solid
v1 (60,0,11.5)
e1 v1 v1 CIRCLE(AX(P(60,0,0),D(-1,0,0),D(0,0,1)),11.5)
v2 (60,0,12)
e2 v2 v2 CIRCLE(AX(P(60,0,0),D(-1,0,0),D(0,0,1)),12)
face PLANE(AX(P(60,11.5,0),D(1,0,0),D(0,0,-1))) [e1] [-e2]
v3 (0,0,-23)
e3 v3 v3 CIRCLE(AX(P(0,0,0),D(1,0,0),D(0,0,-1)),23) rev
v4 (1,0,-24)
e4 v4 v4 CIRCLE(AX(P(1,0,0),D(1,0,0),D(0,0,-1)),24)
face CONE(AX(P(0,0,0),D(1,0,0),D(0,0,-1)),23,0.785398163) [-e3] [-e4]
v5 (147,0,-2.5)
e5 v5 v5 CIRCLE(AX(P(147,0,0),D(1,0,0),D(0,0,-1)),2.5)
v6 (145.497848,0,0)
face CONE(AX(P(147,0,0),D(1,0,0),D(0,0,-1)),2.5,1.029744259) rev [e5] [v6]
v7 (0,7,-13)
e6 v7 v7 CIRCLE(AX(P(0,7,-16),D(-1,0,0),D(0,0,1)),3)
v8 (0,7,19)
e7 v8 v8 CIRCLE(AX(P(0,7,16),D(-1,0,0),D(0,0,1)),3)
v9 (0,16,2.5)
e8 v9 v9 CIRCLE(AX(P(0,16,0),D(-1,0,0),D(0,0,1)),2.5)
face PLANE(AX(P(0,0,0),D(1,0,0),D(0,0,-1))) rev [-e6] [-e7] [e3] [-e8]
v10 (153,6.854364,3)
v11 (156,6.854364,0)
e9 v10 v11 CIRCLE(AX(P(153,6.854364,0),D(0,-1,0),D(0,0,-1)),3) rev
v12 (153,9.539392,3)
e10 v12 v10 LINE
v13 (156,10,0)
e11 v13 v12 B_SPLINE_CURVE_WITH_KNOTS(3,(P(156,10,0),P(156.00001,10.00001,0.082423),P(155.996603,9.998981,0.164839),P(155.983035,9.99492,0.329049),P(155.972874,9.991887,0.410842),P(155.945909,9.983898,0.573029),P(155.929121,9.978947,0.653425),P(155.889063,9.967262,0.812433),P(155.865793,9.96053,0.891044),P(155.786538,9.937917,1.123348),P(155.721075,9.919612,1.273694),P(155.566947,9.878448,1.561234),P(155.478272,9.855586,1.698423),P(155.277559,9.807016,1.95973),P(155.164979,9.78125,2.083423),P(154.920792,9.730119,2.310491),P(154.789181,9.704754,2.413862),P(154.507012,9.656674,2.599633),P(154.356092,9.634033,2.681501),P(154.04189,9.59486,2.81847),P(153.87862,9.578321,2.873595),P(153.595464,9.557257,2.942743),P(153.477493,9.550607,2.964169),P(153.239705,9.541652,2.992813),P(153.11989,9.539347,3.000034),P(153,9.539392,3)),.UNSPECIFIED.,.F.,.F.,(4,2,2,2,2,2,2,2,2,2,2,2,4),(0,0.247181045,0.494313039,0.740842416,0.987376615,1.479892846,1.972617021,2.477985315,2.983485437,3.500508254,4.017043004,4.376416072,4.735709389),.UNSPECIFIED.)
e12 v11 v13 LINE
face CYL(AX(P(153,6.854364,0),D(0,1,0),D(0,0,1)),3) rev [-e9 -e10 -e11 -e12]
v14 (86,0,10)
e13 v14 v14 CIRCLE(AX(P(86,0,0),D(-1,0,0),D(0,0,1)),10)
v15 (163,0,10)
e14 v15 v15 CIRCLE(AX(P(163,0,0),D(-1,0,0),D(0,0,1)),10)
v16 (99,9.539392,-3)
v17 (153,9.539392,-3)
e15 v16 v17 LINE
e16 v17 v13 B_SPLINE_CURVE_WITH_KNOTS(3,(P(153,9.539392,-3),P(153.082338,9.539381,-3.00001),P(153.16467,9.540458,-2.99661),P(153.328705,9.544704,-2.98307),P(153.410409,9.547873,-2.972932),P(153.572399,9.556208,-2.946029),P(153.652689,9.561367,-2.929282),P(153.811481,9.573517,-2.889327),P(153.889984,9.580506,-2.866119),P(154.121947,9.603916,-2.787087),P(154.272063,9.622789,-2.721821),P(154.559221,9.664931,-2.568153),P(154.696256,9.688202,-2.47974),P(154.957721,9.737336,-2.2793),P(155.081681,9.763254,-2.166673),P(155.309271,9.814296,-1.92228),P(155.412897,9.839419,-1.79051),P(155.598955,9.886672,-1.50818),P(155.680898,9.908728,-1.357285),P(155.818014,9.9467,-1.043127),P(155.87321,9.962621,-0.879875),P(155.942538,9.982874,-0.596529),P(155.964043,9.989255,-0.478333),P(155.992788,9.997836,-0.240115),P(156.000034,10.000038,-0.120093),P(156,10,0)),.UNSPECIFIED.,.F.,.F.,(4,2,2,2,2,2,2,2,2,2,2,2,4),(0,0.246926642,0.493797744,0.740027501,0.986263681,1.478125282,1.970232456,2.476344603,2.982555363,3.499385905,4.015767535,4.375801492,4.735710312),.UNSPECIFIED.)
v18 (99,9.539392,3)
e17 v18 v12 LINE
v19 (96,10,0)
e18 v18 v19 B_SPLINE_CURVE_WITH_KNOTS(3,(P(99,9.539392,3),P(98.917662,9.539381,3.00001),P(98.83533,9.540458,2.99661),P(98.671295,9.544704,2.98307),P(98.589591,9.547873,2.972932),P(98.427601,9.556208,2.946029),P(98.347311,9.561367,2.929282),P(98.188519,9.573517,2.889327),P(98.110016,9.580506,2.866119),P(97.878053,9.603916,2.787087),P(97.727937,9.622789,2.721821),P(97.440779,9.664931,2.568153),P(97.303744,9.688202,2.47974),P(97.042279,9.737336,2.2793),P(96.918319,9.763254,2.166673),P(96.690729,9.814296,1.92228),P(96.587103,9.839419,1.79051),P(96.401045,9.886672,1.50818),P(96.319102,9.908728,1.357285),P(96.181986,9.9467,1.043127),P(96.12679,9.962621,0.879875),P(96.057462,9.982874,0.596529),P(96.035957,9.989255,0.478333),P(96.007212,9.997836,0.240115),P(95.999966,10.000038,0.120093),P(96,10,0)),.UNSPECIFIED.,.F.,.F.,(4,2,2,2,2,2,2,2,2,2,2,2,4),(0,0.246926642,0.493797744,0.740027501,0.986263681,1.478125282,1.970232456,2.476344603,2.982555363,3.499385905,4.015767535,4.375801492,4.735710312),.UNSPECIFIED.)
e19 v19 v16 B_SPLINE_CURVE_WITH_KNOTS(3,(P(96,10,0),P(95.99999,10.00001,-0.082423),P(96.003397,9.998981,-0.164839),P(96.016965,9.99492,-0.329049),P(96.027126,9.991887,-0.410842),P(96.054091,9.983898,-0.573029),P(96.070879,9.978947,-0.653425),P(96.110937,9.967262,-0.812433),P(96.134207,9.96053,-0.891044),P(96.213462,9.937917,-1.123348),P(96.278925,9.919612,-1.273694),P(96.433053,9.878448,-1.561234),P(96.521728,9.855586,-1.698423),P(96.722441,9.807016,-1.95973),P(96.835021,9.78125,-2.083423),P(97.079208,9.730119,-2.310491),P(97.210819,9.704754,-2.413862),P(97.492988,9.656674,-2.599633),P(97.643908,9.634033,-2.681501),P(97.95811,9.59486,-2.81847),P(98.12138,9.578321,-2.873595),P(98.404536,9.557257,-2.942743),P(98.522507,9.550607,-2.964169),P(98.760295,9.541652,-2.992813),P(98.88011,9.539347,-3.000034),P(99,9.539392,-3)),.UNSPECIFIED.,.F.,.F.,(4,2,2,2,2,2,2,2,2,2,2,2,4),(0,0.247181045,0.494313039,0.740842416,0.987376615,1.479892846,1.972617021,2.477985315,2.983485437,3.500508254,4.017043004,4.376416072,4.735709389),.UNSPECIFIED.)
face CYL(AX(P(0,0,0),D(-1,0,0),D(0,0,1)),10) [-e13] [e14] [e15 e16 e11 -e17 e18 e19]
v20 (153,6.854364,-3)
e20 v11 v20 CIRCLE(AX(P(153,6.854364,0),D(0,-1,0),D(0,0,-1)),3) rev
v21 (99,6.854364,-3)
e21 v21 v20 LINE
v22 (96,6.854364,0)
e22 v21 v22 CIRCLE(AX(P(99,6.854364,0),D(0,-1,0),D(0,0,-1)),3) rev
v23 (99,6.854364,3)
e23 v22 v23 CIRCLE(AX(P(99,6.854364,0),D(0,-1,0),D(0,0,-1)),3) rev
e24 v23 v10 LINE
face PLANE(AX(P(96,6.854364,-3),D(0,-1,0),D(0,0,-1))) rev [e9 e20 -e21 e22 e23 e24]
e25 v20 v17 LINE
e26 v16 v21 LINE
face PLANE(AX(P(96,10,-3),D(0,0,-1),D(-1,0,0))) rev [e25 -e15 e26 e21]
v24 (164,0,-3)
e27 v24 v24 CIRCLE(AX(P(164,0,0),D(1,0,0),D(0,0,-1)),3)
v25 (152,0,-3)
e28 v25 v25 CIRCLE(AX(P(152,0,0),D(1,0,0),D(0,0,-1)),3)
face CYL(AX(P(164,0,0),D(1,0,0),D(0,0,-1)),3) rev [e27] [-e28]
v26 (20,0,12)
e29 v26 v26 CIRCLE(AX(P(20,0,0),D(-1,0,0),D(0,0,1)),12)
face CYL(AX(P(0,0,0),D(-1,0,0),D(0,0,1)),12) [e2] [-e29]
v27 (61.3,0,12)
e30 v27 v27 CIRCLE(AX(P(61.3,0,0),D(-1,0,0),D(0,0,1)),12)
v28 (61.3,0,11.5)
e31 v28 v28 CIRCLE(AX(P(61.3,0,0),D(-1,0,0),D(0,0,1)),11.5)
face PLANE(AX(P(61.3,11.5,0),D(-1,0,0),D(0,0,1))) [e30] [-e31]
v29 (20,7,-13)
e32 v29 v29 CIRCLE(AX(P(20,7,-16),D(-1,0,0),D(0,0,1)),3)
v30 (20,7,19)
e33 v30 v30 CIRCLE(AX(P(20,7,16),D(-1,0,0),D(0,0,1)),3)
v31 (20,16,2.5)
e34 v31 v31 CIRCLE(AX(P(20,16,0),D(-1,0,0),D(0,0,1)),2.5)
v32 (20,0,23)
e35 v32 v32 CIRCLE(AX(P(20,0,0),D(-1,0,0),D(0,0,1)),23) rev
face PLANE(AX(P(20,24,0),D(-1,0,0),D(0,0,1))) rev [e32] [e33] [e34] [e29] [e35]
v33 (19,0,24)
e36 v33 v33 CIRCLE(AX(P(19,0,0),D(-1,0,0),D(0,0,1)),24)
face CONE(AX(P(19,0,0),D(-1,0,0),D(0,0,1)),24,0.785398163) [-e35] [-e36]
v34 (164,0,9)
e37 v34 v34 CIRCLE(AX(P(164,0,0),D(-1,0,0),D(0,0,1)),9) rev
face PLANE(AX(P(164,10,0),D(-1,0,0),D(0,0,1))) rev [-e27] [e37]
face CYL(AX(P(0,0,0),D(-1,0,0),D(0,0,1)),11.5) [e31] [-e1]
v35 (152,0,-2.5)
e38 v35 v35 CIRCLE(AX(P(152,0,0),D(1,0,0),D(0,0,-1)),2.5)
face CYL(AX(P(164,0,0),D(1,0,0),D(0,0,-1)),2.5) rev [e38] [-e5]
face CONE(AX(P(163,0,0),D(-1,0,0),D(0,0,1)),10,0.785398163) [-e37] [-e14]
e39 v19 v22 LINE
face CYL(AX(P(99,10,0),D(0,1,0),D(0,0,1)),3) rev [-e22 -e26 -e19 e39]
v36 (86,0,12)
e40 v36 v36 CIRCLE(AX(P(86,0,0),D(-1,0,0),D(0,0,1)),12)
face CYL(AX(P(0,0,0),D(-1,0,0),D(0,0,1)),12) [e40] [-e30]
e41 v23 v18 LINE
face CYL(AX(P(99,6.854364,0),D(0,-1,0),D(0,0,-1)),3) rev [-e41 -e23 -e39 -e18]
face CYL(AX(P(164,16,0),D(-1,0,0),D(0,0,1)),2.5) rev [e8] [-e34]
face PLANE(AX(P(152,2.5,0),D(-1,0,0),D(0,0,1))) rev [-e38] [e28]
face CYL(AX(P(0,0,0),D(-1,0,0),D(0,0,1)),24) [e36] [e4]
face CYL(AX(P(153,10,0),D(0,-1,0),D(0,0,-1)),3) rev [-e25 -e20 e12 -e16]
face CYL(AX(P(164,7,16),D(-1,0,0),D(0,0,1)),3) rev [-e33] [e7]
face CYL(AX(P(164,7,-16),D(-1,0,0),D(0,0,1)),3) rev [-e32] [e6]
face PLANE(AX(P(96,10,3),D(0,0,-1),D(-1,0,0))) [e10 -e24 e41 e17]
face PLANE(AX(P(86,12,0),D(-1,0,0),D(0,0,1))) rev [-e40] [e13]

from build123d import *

# Parameters (mm, degrees)
PER_AGE1_D              = 5
PER_AGE1_DEPTH          = 17
PER_AGE1_CBORE_D        = 6
PER_AGE1_CBORE_DEPTH    = 12
PER_AGE1_TIP            = 1.502151548
ESQUISSE6_W             = 1.3
ESQUISSE6_H             = 0.5
ESQUISSE5_W             = 60
ESQUISSE5_H             = 3.145636389
ENL_V_MAT_EXTRU_1_DEPTH = 3
CONG_1_R                = 3
CHANFREIN1_SIZE         = 1
ESQUISSE7_R             = 3
ESQUISSE7_R_2           = 2.5
ENL_V_MAT_EXTRU_2_DEPTH = 168.475371324


with BuildPart() as part:
    # Esquisse1 → Base-Révolution (revolve)
    with BuildSketch(Plane.XY, mode=Mode.PRIVATE) as base_r_volution_sk:
        Polygon((0, 0), (0, 24), (20, 24), (20, 12), (86, 12), (86, 10), (164, 10), (164, 0), align=None)
    revolve(base_r_volution_sk.sketch.rotate(Axis((0, 0, 0), (1, 0, 0)), 90), axis=Axis((0, 0, 0), (1, 0, 0)))

    # Perçage1
    with Locations(Plane(origin=(164, 0, 0), x_dir=(0, 0, -1), z_dir=(1, 0, 0))):
        with Locations((0, 0)):
            CounterBoreHole(PER_AGE1_D / 2, PER_AGE1_CBORE_D / 2, PER_AGE1_CBORE_DEPTH, depth=PER_AGE1_DEPTH)
            with Locations((0, 0, -(PER_AGE1_DEPTH + PER_AGE1_TIP / 2))):  # 118° drill point
                Cone(0, PER_AGE1_D / 2, PER_AGE1_TIP, mode=Mode.SUBTRACT)

    # Esquisse6 → Enlèvement de matière-Révolution1 (revolve, cut)
    with BuildSketch(Plane.XY, mode=Mode.PRIVATE) as enl_vement_de_mati_re_r_volution1_sk:
        with Locations((60.65, 11.75)):
            Rectangle(ESQUISSE6_W, ESQUISSE6_H)
    revolve(enl_vement_de_mati_re_r_volution1_sk.sketch.rotate(Axis((0, 0, 0), (1, 0, 0)), 90), axis=Axis((0, 0, 0), (1, 0, 0)), mode=Mode.SUBTRACT)

    # Esquisse5 → Enlèv. mat.-Extru.1 (cut, symmetric)
    with BuildSketch(Plane.XY):
        with Locations((126, 8.427181806)):
            Rectangle(ESQUISSE5_W, ESQUISSE5_H)
    extrude(amount=ENL_V_MAT_EXTRU_1_DEPTH, both=True, mode=Mode.SUBTRACT)

    # Congé1
    cong_1_edges = [part.edges().sort_by_distance(p)[0] for p in [
        (96, 8.196877813, 3),
        (156, 8.196877813, 3),
        (156, 8.196877813, -3),
        (96, 8.196877813, -3),
    ]]
    fillet(cong_1_edges, radius=CONG_1_R - 0.0001)  # a hair under: the kernel refuses the full size

    # Chanfrein1
    chanfrein1_edges = [part.edges().sort_by_distance(p)[0] for p in [
        (164, 0, -10),
        (20, 0, -24),
        (0, 0, -24),
    ]]
    chamfer(chanfrein1_edges, length=CHANFREIN1_SIZE)

    # Esquisse7 → Enlèv. mat.-Extru.2 (cut, through all)
    with BuildSketch(Plane.ZY):
        with Locations((-16, 7)):
            Circle(ESQUISSE7_R)
        with Locations((16, 7)):
            Circle(ESQUISSE7_R)
        with Locations((0, 16)):
            Circle(ESQUISSE7_R_2)
    extrude(amount=-ENL_V_MAT_EXTRU_2_DEPTH, mode=Mode.SUBTRACT)


solid = part.part
